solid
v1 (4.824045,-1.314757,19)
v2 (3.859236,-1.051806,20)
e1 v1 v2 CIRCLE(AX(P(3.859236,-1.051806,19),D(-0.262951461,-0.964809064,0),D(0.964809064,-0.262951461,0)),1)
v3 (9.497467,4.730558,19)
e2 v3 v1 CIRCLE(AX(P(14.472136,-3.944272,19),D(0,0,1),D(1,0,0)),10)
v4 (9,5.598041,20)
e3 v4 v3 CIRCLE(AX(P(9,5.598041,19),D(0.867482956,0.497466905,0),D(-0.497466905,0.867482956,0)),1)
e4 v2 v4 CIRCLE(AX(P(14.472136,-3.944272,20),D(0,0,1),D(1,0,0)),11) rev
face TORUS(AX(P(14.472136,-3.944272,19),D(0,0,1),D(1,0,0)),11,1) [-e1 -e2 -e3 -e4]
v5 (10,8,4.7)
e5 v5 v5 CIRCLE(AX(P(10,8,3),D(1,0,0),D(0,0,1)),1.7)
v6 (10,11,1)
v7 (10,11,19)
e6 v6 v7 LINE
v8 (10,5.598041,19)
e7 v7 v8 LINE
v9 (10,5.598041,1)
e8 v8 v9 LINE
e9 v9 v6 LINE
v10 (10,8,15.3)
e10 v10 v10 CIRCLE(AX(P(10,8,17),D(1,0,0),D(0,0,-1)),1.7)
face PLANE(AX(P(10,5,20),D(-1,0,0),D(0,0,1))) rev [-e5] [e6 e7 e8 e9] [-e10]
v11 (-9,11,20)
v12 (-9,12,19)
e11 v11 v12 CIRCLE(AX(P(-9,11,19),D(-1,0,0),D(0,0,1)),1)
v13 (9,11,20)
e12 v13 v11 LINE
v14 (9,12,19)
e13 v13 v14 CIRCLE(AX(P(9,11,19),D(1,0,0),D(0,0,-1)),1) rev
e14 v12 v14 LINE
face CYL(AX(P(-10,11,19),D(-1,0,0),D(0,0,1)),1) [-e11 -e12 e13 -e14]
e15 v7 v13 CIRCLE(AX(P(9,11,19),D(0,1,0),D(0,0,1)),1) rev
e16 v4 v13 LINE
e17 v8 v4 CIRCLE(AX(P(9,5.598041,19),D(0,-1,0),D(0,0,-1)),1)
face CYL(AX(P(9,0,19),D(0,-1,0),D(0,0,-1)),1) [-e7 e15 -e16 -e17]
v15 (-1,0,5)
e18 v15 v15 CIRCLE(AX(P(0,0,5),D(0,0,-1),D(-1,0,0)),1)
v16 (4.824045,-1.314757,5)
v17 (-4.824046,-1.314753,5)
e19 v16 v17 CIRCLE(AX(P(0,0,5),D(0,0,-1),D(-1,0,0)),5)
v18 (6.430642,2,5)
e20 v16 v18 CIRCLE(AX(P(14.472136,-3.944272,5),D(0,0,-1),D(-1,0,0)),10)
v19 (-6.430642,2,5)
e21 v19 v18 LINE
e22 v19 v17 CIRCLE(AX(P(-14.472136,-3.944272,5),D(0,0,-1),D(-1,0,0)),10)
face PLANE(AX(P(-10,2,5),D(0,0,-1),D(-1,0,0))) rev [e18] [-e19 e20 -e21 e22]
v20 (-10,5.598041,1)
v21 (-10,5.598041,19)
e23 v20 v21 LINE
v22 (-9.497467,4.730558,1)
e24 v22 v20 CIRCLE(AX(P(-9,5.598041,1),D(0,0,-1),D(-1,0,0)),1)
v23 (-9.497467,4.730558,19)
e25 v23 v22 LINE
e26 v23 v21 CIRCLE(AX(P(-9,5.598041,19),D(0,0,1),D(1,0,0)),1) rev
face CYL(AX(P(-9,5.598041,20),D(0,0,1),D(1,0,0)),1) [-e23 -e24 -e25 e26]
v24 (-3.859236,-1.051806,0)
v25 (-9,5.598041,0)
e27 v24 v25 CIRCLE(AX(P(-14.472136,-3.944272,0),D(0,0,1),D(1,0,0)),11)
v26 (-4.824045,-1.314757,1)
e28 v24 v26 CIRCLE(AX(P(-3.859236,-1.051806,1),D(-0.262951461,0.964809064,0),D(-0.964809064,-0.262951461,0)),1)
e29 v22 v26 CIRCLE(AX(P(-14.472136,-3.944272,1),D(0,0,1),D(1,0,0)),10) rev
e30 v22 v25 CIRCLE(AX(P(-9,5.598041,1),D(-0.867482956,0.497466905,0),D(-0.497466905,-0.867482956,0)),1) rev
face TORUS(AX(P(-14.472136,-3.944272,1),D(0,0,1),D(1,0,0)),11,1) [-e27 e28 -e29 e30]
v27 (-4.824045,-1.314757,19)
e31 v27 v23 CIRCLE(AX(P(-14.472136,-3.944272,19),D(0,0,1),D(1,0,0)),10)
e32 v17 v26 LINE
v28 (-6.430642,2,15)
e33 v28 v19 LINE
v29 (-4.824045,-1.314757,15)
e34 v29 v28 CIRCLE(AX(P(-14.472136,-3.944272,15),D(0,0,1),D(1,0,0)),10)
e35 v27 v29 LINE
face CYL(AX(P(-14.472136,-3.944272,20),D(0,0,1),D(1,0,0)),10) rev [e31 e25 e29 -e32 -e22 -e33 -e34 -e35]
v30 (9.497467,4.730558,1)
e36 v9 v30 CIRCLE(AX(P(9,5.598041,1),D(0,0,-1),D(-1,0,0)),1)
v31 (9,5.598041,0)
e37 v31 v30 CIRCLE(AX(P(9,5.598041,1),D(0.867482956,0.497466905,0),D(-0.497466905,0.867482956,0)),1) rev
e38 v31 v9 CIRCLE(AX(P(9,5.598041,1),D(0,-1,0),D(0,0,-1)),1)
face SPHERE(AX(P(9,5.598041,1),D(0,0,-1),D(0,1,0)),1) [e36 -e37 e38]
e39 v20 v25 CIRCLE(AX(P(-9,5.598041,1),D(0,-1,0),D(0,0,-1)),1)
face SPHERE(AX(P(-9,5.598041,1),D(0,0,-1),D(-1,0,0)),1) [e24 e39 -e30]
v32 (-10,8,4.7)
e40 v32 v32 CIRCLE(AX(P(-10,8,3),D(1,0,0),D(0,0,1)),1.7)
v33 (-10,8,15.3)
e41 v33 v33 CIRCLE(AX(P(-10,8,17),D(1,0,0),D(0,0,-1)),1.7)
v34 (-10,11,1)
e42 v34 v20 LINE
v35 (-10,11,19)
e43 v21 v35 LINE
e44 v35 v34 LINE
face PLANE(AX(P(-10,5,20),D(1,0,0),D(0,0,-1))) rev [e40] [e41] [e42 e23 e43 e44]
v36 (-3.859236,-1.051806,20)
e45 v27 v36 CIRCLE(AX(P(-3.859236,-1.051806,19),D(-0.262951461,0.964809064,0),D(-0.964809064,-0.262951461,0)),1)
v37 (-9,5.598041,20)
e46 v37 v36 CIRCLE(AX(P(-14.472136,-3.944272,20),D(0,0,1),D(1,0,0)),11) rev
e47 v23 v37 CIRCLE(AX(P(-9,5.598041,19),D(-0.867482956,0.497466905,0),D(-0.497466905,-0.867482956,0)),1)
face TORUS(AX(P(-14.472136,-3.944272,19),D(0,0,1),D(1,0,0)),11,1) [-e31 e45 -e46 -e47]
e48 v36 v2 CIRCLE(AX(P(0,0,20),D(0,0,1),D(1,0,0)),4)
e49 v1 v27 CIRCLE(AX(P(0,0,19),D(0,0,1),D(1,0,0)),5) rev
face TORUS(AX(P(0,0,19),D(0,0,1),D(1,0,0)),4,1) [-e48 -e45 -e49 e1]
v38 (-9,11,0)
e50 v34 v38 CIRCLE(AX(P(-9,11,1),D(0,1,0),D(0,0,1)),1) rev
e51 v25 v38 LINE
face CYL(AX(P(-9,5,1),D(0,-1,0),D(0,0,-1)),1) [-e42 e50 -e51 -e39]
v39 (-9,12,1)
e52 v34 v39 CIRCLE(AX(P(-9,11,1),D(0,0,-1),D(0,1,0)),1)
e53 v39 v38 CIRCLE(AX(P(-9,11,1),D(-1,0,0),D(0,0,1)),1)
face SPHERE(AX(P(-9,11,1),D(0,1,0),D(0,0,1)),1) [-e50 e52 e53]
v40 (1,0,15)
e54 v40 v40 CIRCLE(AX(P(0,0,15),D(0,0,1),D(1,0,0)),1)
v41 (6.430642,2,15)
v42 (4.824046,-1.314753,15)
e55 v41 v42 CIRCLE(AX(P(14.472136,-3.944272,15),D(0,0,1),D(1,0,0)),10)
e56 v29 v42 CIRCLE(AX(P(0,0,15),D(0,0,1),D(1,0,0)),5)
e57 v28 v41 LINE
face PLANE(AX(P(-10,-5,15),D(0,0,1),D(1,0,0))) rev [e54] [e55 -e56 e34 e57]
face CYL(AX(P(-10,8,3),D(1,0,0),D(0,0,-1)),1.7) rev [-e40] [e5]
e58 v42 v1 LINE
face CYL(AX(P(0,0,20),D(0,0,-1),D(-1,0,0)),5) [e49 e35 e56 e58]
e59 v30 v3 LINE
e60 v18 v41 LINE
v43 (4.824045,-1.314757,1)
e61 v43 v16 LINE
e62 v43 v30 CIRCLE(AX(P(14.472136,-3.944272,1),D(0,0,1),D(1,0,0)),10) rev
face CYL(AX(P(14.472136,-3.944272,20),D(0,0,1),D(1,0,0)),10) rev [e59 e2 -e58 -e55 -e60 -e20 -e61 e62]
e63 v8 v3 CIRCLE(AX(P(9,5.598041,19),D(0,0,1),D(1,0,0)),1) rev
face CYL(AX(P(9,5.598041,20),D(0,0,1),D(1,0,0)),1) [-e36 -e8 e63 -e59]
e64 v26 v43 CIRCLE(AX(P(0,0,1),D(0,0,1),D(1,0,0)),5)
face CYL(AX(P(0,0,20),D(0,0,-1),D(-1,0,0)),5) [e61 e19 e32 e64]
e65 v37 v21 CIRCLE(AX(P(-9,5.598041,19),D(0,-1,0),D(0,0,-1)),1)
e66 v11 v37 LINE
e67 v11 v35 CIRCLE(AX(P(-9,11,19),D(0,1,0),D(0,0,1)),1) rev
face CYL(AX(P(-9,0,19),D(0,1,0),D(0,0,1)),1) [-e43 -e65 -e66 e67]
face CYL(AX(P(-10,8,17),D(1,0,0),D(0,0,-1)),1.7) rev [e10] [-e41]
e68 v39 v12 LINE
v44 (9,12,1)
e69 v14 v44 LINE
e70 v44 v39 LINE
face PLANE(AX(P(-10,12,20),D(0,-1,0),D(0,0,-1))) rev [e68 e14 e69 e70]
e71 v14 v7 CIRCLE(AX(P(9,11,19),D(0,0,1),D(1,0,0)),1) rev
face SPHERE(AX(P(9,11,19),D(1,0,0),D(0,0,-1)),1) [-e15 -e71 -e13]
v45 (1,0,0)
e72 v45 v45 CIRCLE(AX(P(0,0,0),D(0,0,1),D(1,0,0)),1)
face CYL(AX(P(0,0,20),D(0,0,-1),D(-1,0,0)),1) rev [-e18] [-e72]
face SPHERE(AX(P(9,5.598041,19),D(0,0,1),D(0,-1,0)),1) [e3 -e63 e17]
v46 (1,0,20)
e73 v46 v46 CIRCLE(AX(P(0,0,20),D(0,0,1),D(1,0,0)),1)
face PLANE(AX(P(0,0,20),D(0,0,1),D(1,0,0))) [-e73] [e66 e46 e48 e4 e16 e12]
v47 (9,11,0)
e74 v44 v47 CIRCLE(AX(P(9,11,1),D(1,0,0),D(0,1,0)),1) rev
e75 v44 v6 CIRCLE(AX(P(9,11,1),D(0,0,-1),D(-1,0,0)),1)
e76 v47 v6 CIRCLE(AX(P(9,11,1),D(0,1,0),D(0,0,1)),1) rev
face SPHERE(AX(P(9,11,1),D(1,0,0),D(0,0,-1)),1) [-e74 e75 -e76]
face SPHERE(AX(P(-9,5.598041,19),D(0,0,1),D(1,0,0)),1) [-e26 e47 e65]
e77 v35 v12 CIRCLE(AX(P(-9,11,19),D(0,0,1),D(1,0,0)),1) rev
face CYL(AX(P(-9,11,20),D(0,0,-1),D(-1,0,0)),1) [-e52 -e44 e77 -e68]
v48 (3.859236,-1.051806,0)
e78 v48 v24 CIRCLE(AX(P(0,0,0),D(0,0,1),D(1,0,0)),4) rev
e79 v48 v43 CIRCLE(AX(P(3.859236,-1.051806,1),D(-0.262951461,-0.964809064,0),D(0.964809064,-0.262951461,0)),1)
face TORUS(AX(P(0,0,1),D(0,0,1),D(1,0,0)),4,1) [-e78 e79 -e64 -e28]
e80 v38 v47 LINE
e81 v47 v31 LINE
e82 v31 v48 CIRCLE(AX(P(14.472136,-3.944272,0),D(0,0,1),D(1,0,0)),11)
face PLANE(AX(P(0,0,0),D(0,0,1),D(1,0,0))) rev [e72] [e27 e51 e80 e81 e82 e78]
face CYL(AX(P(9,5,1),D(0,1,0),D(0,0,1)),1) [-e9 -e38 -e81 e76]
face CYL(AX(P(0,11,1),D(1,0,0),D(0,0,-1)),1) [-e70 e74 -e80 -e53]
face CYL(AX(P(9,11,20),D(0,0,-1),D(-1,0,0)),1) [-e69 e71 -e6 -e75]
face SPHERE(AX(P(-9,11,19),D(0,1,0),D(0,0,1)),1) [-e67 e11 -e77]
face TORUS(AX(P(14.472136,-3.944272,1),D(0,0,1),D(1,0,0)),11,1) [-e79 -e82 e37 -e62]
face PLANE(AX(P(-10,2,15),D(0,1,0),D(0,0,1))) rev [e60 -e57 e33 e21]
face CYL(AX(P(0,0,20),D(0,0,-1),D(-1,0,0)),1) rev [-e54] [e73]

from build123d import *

# Parameters (mm, degrees)
SKETCH1_R           = 1
BOSS_EXTRUDE1_DEPTH = 20
SKETCH2_R           = 1.7
CUT_EXTRUDE1_DEPTH  = 33.496153619
SKETCH3_W           = 20
SKETCH3_H           = 4
CUT_EXTRUDE2_DEPTH  = 33.496153619
CUT_EXTRUDE3_DEPTH  = 28.730849248
FILLET1_DEPTH       = 20
FILLET1_2_DEPTH     = 5
FILLET1_START       = 15
FILLET1_3_DEPTH     = 5
FILLET2_R           = 1


with BuildPart() as part:
    # Sketch1 → Boss-Extrude1 (new body)
    with BuildSketch(Plane.XY):
        with BuildLine():
            Line((5, 0), (5, 5))
            Line((5, 5), (10, 5))
            Line((10, 5), (10, 16))
            Line((10, 16), (-10, 16))
            Line((-10, 16), (-10, 5))
            Line((-10, 5), (-5, 5))
            Line((-5, 5), (-5, 0))
            ThreePointArc((-5, 0), (0, -5), (5, 0))
        make_face()
        Circle(SKETCH1_R, mode=Mode.SUBTRACT)
    extrude(amount=BOSS_EXTRUDE1_DEPTH)

    # Sketch2 → Cut-Extrude1 (cut, through all)
    with BuildSketch(Plane(origin=(10, 0, 0), x_dir=(0, 0, -1), z_dir=(1, 0, 0))):
        with Locations((-17, 8)):
            Circle(SKETCH2_R)
        with Locations(Location((-3, 8, 0), (0, 0, 180))):
            Circle(SKETCH2_R)
    extrude(amount=-CUT_EXTRUDE1_DEPTH, mode=Mode.SUBTRACT)

    # Sketch3 → Cut-Extrude2 (cut, through all)
    with BuildSketch(Plane(origin=(10, 0, 0), x_dir=(0, 0, -1), z_dir=(1, 0, 0))):
        with Locations((-10, 14)):
            Rectangle(SKETCH3_W, SKETCH3_H)
    extrude(amount=-CUT_EXTRUDE2_DEPTH, mode=Mode.SUBTRACT)

    # Sketch4 → Cut-Extrude3 (cut, through all)
    with BuildSketch(Plane(origin=(5, 0, 0), x_dir=(0, 0, -1), z_dir=(1, 0, 0))):
        Polygon((-10, -5), (-15, -5), (-15, 2), (-5, 2), (-5, -5), align=None)
    extrude(amount=-CUT_EXTRUDE3_DEPTH, mode=Mode.SUBTRACT)

    # Fillet1: read off the stored shape, not the designer's step
    # Fillet1 outline → Fillet1 (add)
    with BuildSketch(Plane.XY):
        with BuildLine():
            Line((5, 2), (6.4306416, 2))
            ThreePointArc((6.4306416, 2), (8.038028722, 3.710939656), (10, 5))
            Line((10, 5), (5, 5))
            Line((5, 5), (5, 2))
        make_face()
        with BuildLine():
            Line((-6.4306416, 2), (-5, 2))
            Line((-5, 2), (-5, 5))
            Line((-5, 5), (-10, 5))
            ThreePointArc((-10, 5), (-8.038028722, 3.710939656), (-6.4306416, 2))
        make_face()
    extrude(amount=FILLET1_DEPTH)

    # Fillet1 2 outline → Fillet1 2 (add)
    with BuildSketch(Plane.XY):
        with BuildLine():
            ThreePointArc((4.824045318, -1.314757303), (5.473399472, 0.417234907), (6.4306416, 2))
            Line((6.4306416, 2), (5, 2))
            Line((5, 2), (5, 0))
            ThreePointArc((5, 0), (4.955816204, -0.663238839), (4.824045318, -1.314757303))
        make_face()
        with BuildLine():
            Line((-5, 0), (-5, 2))
            Line((-5, 2), (-6.4306416, 2))
            ThreePointArc((-6.4306416, 2), (-5.473399472, 0.417234907), (-4.824045318, -1.314757303))
            ThreePointArc((-4.824045318, -1.314757303), (-4.955816204, -0.663238839), (-5, 0))
        make_face()
    extrude(amount=FILLET1_2_DEPTH)

    # Fillet1 3 outline → Fillet1 3 (add)
    with BuildSketch(Plane.XY.offset(FILLET1_START)):
        with BuildLine():
            ThreePointArc((4.824045318, -1.314757303), (5.473399472, 0.417234907), (6.4306416, 2))
            Line((6.4306416, 2), (5, 2))
            Line((5, 2), (5, 0))
            ThreePointArc((5, 0), (4.955816204, -0.663238839), (4.824045318, -1.314757303))
        make_face()
        with BuildLine():
            Line((-5, 0), (-5, 2))
            Line((-5, 2), (-6.4306416, 2))
            ThreePointArc((-6.4306416, 2), (-5.473399472, 0.417234907), (-4.824045318, -1.314757303))
            ThreePointArc((-4.824045318, -1.314757303), (-4.955816204, -0.663238839), (-5, 0))
        make_face()
    extrude(amount=FILLET1_3_DEPTH)

    # Fillet2
    fillet2_edges = [part.edges().sort_by_distance(p)[0] for p in [
        (10, 8.5, 0),
        (-10, 5, 10),
        (10, 5, 10),
        (10, 8.5, 20),
        (-10, 8.5, 0),
        (-10, 8.5, 20),
        (-10, 12, 10),
        (0, 12, 0),
        (0, 12, 20),
        (10, 12, 10),
        (0, -5, 0),
        (0, -5, 20),
        (8.038028722, 3.710939656, 0),
        (8.038028722, 3.710939656, 20),
        (-8.038028722, 3.710939656, 0),
        (-8.038028722, 3.710939656, 20),
    ]]
    fillet(fillet2_edges, radius=FILLET2_R)


solid = part.part
